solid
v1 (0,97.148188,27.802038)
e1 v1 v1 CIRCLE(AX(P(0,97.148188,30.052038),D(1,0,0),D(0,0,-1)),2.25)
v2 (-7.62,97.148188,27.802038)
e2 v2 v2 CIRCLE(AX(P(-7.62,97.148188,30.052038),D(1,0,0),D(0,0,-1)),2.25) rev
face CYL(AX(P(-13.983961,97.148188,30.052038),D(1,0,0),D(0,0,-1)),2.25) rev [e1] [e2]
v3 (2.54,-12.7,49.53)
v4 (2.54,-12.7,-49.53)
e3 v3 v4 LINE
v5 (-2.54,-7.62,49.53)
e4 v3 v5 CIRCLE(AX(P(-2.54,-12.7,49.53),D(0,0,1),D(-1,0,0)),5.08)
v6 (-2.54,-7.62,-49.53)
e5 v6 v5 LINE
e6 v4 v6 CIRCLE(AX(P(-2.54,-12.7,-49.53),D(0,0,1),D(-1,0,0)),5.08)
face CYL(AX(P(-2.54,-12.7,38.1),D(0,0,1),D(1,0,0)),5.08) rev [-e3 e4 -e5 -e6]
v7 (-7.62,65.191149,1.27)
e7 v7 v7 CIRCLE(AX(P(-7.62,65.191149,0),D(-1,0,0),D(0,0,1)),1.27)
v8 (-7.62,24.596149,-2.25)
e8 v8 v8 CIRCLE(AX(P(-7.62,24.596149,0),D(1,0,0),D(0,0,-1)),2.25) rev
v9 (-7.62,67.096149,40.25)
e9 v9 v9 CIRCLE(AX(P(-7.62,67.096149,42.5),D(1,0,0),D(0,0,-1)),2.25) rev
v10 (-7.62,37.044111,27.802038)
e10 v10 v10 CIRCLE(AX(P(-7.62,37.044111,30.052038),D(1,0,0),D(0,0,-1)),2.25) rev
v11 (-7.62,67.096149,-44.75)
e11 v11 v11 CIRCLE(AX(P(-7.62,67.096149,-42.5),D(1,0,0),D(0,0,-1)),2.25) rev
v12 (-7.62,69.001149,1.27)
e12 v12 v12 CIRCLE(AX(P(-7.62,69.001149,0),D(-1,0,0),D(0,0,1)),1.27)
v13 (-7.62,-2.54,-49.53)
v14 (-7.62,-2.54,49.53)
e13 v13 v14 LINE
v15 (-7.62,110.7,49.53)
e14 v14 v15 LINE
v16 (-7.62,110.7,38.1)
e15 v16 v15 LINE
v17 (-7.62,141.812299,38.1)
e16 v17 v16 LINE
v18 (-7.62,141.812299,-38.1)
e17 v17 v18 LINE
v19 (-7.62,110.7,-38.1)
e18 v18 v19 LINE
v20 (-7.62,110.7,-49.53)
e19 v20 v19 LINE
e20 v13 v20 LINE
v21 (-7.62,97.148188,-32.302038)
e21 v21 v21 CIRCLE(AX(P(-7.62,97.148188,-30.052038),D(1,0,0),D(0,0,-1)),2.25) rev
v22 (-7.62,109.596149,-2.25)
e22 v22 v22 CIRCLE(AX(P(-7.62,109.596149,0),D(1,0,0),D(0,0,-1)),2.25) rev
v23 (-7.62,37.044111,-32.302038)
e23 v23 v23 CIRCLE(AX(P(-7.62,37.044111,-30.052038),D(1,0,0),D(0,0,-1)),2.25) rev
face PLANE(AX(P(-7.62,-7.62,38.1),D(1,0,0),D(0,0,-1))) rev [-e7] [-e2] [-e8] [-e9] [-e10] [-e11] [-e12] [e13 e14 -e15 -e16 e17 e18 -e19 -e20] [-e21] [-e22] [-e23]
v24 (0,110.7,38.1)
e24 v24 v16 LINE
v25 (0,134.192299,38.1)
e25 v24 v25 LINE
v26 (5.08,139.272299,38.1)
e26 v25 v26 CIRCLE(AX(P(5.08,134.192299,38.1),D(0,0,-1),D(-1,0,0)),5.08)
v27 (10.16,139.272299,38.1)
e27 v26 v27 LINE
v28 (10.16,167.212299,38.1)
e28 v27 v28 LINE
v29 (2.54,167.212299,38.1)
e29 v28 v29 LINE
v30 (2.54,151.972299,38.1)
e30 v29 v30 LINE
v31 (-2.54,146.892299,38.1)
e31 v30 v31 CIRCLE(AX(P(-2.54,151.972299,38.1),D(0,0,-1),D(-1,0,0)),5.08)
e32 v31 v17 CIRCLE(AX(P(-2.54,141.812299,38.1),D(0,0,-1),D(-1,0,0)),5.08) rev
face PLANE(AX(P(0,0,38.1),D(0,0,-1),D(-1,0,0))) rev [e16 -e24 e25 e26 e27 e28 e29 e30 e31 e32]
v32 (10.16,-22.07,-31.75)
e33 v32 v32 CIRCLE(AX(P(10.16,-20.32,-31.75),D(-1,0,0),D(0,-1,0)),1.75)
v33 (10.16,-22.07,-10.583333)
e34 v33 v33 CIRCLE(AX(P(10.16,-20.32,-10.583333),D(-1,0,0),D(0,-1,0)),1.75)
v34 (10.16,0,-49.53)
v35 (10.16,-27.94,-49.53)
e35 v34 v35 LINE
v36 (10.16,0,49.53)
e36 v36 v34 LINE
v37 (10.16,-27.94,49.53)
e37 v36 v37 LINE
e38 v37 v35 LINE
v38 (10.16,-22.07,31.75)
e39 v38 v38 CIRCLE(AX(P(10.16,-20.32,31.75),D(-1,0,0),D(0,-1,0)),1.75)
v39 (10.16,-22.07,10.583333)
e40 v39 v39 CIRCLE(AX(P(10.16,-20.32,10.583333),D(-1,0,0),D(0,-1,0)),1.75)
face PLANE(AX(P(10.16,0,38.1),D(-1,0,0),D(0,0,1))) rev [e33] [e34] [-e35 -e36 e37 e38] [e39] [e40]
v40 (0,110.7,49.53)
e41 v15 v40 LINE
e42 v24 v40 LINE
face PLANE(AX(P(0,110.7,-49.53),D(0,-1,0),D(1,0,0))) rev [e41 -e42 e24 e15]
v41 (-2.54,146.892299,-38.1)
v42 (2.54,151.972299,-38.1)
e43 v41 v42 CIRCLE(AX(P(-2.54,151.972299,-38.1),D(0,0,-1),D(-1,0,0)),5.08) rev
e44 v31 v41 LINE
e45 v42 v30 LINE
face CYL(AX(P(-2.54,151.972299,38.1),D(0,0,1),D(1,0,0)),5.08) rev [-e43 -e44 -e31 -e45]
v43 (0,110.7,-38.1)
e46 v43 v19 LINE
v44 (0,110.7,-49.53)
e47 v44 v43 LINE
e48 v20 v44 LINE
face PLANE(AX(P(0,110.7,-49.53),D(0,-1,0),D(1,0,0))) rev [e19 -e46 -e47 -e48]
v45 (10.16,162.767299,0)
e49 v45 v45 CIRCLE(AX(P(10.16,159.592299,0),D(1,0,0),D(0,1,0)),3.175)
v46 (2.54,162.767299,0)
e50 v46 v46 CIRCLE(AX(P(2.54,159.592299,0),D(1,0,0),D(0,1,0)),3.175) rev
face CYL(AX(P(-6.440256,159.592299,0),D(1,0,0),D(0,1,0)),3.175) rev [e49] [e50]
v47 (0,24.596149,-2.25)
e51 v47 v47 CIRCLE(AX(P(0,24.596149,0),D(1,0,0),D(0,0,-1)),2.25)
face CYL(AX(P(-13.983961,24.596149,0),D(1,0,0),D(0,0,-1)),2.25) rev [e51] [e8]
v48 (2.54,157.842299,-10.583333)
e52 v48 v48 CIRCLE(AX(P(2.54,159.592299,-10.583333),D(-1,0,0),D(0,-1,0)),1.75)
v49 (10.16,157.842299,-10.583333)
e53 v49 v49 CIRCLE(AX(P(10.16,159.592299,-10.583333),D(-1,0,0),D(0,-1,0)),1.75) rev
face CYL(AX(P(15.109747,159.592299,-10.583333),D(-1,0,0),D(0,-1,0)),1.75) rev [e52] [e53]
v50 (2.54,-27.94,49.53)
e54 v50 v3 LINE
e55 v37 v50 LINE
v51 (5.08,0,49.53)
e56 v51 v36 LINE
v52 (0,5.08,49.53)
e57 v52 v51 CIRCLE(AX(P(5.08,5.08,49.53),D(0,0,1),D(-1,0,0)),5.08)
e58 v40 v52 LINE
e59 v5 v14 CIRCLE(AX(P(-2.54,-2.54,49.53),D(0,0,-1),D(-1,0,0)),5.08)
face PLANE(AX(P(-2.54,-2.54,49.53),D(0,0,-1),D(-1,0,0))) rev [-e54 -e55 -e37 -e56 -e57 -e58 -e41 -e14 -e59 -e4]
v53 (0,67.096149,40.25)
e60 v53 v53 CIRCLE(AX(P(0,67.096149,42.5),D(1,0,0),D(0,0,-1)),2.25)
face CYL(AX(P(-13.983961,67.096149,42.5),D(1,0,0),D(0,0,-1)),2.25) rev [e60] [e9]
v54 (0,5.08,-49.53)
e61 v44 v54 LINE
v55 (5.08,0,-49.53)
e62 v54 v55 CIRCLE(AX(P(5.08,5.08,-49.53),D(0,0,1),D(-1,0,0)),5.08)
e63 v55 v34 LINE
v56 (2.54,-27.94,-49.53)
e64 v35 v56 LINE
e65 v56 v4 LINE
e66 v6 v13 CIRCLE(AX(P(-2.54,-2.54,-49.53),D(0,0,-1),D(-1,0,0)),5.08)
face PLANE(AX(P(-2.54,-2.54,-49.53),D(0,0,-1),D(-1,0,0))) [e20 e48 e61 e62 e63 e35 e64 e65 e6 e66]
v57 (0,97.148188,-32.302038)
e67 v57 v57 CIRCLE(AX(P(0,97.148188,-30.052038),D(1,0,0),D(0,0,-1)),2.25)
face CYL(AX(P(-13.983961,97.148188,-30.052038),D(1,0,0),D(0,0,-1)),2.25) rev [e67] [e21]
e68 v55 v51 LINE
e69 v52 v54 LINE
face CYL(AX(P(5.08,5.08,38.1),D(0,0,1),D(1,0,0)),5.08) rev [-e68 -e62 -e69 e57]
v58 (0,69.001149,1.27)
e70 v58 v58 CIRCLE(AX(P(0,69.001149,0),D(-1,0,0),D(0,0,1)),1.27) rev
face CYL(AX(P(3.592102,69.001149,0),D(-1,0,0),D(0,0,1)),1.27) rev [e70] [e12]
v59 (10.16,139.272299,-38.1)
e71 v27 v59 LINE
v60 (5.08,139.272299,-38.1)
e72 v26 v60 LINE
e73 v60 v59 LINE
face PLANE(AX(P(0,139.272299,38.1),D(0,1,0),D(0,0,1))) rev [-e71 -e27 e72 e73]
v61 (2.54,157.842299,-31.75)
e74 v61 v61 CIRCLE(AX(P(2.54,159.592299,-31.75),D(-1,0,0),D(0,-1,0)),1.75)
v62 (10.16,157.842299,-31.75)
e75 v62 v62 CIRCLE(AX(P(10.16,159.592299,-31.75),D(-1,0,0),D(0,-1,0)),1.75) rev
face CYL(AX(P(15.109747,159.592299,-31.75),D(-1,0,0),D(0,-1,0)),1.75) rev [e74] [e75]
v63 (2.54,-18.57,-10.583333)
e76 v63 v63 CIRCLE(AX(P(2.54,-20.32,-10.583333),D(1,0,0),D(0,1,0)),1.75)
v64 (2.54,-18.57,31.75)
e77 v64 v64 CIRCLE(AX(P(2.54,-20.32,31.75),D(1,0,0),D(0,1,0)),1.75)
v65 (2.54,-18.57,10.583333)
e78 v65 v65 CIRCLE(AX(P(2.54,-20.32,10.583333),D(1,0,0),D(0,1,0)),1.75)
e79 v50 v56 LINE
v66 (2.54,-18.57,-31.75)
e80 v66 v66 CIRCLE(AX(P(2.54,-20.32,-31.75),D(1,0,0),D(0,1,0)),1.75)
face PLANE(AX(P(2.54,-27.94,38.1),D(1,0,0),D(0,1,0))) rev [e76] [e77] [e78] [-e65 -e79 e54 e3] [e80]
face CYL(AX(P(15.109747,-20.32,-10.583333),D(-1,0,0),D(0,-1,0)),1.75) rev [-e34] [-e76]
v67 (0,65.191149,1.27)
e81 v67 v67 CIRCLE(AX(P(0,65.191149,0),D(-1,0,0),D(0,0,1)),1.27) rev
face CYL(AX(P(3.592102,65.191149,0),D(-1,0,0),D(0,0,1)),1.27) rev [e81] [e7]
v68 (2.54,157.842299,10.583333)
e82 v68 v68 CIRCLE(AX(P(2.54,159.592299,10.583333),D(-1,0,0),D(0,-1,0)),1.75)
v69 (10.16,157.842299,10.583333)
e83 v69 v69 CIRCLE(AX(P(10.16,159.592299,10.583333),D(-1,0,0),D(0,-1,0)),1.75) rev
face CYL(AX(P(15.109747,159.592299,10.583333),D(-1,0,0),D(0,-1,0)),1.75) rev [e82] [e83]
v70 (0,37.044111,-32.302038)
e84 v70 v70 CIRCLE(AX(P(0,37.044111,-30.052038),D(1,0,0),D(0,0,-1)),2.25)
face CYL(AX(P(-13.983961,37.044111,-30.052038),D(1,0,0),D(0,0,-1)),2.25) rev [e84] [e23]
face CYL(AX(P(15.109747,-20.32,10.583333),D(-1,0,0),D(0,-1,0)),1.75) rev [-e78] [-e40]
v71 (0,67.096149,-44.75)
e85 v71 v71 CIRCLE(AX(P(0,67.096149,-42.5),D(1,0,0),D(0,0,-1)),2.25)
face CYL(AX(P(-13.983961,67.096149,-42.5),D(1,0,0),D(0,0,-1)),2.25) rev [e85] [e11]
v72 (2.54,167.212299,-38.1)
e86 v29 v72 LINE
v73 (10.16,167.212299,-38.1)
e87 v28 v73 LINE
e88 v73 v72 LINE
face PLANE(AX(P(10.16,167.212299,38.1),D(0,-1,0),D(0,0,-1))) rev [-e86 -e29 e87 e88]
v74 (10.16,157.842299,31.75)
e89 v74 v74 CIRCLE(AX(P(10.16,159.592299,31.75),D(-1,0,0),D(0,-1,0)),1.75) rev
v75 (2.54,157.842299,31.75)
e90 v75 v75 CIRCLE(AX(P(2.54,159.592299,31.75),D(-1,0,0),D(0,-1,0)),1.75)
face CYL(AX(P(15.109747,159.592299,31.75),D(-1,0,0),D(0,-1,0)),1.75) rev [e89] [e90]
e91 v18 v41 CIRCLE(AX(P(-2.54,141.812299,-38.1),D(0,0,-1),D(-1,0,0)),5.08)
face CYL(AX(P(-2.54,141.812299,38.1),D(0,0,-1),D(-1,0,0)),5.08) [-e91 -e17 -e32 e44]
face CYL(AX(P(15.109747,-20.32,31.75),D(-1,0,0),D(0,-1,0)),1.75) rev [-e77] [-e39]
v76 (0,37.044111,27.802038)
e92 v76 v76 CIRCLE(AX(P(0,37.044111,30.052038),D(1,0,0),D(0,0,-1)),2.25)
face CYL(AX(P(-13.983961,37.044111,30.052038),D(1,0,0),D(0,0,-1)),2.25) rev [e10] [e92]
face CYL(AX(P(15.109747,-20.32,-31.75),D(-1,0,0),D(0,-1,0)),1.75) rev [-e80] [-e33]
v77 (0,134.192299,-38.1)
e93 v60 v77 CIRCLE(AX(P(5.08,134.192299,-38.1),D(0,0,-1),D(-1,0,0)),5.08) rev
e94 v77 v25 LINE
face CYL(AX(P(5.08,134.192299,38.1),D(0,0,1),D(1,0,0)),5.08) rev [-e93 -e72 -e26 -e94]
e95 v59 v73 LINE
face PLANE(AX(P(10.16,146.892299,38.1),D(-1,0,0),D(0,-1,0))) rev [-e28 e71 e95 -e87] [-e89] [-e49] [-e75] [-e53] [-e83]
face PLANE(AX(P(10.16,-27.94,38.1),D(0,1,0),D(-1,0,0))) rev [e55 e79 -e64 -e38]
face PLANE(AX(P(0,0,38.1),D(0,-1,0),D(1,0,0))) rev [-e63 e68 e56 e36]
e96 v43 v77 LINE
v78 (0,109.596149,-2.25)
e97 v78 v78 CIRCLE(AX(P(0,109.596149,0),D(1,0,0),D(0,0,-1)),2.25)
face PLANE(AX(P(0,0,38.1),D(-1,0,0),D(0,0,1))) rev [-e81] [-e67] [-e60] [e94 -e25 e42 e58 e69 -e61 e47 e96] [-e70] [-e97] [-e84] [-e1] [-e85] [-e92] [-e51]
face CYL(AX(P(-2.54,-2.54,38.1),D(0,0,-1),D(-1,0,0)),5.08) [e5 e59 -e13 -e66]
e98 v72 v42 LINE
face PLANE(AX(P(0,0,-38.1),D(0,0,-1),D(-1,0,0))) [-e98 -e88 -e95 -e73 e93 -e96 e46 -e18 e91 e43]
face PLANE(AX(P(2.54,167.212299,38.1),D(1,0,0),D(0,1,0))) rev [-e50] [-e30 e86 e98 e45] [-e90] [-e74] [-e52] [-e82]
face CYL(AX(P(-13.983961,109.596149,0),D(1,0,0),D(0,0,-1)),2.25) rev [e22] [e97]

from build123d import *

# Parameters (mm, degrees)
BOSS_EXTRUDE1_DEPTH = 38.1
FILLET1_R           = 5.08
BOSS_EXTRUDE2_DEPTH = 49.53
SKETCH7_R           = 2.25
CUT_EXTRUDE1_DEPTH  = 7.62
SKETCH8_R           = 1.75
CUT_EXTRUDE2_DEPTH  = 7.62
SKETCH10_R          = 3.175
CGTEST1_DEPTH       = 7.62
SKETCH11_R          = 1.27
CUT_EXTRUDE4_DEPTH  = 7.62


with BuildPart() as part:
    # Sketch1 → Boss-Extrude1 (new, symmetric)
    with BuildSketch(Plane.XY):
        Polygon((0, 0), (0, 139.272298857), (10.16, 139.272298857), (10.16, 146.892298857), (10.16, 167.212298857), (2.54, 167.212298857), (2.54, 146.892298857), (-7.62, 146.892298857), (-7.62, 139.272298857), (-7.62, -7.62), (2.54, -7.62), (2.54, -27.94), (10.16, -27.94), (10.16, -7.62), (10.16, 0), align=None)
    extrude(amount=BOSS_EXTRUDE1_DEPTH, both=True)

    # Fillet1
    fillet1_edges = [part.edges().sort_by_distance(p)[0] for p in [
        (0, 0, 0),
        (2.54, -7.62, 0),
        (0, 139.272298857, 0),
        (2.54, 146.892298857, 0),
        (-7.62, 146.892298857, 0),
        (-7.62, -7.62, 0),
    ]]
    fillet(fillet1_edges, radius=FILLET1_R - 0.0001)  # a hair under: the kernel refuses the full size

    # Sketch3 → Boss-Extrude2 (add, symmetric)
    with BuildSketch(Plane(origin=(0, 0, 0), x_dir=(-1, 0, 0), z_dir=(0, 0, -1))):
        with BuildLine():
            Line((0, 110.7), (7.62, 110.7))
            Line((7.62, 110.7), (7.62, -2.54))
            ThreePointArc((7.62, -2.54), (6.132102448, -6.132102448), (2.54, -7.62))
            ThreePointArc((2.54, -7.62), (-1.052102448, -9.107897552), (-2.54, -12.7))
            Line((-2.54, -12.7), (-2.54, -27.94))
            Line((-2.54, -27.94), (-10.16, -27.94))
            Line((-10.16, -27.94), (-10.16, 0))
            Line((-10.16, 0), (-5.08, 0))
            ThreePointArc((-5.08, 0), (-1.487897552, 1.487897552), (0, 5.08))
            Line((0, 5.08), (0, 110.7))
        make_face()
    extrude(amount=BOSS_EXTRUDE2_DEPTH, both=True)

    # Sketch7 → Cut-Extrude1 (cut)
    with BuildSketch(Plane(origin=(0, 0, 0), x_dir=(0, 0, -1), z_dir=(1, 0, 0))):
        with Locations((-42.5, 67.096149428)):
            Circle(SKETCH7_R)
        with Locations((-30.0520382, 97.148187629)):
            Circle(SKETCH7_R)
        with Locations((0, 109.596149428)):
            Circle(SKETCH7_R)
        with Locations((30.0520382, 97.148187629)):
            Circle(SKETCH7_R)
        with Locations((42.5, 67.096149428)):
            Circle(SKETCH7_R)
        with Locations((30.0520382, 37.044111228)):
            Circle(SKETCH7_R)
        with Locations((0, 24.596149428)):
            Circle(SKETCH7_R)
        with Locations((-30.0520382, 37.044111228)):
            Circle(SKETCH7_R)
    extrude(amount=-CUT_EXTRUDE1_DEPTH, mode=Mode.SUBTRACT)

    # Sketch8 → Cut-Extrude2 (cut)
    with BuildSketch(Plane.ZY.offset(-2.54)):
        with Locations(Location((-31.75, 159.592298857, 0), (0, 0, 270))):
            Circle(SKETCH8_R)
        with Locations(Location((-10.583333333, 159.592298857, 0), (0, 0, 270))):
            Circle(SKETCH8_R)
        with Locations(Location((10.583333333, 159.592298857, 0), (0, 0, 270))):
            Circle(SKETCH8_R)
        with Locations(Location((31.75, 159.592298857, 0), (0, 0, 270))):
            Circle(SKETCH8_R)
    cut_extrude2 = extrude(amount=-CUT_EXTRUDE2_DEPTH, mode=Mode.SUBTRACT)

    # Mirror1: Cut-Extrude2 across plane
    add(cut_extrude2.mirror(Plane.ZX.offset(69.636149428)), mode=Mode.SUBTRACT)

    # Sketch10 → CGTest1 (cut)
    with BuildSketch(Plane(origin=(10.16, 0, 0), x_dir=(0, 0, -1), z_dir=(1, 0, 0))):
        with Locations(Location((0, 159.592298857, 0), (0, 0, 90))):
            Circle(SKETCH10_R)
    extrude(amount=-CGTEST1_DEPTH, mode=Mode.SUBTRACT)

    # Sketch11 → Cut-Extrude4 (cut)
    with BuildSketch(Plane.ZY.offset(7.62)):
        with Locations((0, 69.001149428)):
            Circle(SKETCH11_R)
        with Locations((0, 65.191149428)):
            Circle(SKETCH11_R)
    extrude(amount=-CUT_EXTRUDE4_DEPTH, mode=Mode.SUBTRACT)


solid = part.part
